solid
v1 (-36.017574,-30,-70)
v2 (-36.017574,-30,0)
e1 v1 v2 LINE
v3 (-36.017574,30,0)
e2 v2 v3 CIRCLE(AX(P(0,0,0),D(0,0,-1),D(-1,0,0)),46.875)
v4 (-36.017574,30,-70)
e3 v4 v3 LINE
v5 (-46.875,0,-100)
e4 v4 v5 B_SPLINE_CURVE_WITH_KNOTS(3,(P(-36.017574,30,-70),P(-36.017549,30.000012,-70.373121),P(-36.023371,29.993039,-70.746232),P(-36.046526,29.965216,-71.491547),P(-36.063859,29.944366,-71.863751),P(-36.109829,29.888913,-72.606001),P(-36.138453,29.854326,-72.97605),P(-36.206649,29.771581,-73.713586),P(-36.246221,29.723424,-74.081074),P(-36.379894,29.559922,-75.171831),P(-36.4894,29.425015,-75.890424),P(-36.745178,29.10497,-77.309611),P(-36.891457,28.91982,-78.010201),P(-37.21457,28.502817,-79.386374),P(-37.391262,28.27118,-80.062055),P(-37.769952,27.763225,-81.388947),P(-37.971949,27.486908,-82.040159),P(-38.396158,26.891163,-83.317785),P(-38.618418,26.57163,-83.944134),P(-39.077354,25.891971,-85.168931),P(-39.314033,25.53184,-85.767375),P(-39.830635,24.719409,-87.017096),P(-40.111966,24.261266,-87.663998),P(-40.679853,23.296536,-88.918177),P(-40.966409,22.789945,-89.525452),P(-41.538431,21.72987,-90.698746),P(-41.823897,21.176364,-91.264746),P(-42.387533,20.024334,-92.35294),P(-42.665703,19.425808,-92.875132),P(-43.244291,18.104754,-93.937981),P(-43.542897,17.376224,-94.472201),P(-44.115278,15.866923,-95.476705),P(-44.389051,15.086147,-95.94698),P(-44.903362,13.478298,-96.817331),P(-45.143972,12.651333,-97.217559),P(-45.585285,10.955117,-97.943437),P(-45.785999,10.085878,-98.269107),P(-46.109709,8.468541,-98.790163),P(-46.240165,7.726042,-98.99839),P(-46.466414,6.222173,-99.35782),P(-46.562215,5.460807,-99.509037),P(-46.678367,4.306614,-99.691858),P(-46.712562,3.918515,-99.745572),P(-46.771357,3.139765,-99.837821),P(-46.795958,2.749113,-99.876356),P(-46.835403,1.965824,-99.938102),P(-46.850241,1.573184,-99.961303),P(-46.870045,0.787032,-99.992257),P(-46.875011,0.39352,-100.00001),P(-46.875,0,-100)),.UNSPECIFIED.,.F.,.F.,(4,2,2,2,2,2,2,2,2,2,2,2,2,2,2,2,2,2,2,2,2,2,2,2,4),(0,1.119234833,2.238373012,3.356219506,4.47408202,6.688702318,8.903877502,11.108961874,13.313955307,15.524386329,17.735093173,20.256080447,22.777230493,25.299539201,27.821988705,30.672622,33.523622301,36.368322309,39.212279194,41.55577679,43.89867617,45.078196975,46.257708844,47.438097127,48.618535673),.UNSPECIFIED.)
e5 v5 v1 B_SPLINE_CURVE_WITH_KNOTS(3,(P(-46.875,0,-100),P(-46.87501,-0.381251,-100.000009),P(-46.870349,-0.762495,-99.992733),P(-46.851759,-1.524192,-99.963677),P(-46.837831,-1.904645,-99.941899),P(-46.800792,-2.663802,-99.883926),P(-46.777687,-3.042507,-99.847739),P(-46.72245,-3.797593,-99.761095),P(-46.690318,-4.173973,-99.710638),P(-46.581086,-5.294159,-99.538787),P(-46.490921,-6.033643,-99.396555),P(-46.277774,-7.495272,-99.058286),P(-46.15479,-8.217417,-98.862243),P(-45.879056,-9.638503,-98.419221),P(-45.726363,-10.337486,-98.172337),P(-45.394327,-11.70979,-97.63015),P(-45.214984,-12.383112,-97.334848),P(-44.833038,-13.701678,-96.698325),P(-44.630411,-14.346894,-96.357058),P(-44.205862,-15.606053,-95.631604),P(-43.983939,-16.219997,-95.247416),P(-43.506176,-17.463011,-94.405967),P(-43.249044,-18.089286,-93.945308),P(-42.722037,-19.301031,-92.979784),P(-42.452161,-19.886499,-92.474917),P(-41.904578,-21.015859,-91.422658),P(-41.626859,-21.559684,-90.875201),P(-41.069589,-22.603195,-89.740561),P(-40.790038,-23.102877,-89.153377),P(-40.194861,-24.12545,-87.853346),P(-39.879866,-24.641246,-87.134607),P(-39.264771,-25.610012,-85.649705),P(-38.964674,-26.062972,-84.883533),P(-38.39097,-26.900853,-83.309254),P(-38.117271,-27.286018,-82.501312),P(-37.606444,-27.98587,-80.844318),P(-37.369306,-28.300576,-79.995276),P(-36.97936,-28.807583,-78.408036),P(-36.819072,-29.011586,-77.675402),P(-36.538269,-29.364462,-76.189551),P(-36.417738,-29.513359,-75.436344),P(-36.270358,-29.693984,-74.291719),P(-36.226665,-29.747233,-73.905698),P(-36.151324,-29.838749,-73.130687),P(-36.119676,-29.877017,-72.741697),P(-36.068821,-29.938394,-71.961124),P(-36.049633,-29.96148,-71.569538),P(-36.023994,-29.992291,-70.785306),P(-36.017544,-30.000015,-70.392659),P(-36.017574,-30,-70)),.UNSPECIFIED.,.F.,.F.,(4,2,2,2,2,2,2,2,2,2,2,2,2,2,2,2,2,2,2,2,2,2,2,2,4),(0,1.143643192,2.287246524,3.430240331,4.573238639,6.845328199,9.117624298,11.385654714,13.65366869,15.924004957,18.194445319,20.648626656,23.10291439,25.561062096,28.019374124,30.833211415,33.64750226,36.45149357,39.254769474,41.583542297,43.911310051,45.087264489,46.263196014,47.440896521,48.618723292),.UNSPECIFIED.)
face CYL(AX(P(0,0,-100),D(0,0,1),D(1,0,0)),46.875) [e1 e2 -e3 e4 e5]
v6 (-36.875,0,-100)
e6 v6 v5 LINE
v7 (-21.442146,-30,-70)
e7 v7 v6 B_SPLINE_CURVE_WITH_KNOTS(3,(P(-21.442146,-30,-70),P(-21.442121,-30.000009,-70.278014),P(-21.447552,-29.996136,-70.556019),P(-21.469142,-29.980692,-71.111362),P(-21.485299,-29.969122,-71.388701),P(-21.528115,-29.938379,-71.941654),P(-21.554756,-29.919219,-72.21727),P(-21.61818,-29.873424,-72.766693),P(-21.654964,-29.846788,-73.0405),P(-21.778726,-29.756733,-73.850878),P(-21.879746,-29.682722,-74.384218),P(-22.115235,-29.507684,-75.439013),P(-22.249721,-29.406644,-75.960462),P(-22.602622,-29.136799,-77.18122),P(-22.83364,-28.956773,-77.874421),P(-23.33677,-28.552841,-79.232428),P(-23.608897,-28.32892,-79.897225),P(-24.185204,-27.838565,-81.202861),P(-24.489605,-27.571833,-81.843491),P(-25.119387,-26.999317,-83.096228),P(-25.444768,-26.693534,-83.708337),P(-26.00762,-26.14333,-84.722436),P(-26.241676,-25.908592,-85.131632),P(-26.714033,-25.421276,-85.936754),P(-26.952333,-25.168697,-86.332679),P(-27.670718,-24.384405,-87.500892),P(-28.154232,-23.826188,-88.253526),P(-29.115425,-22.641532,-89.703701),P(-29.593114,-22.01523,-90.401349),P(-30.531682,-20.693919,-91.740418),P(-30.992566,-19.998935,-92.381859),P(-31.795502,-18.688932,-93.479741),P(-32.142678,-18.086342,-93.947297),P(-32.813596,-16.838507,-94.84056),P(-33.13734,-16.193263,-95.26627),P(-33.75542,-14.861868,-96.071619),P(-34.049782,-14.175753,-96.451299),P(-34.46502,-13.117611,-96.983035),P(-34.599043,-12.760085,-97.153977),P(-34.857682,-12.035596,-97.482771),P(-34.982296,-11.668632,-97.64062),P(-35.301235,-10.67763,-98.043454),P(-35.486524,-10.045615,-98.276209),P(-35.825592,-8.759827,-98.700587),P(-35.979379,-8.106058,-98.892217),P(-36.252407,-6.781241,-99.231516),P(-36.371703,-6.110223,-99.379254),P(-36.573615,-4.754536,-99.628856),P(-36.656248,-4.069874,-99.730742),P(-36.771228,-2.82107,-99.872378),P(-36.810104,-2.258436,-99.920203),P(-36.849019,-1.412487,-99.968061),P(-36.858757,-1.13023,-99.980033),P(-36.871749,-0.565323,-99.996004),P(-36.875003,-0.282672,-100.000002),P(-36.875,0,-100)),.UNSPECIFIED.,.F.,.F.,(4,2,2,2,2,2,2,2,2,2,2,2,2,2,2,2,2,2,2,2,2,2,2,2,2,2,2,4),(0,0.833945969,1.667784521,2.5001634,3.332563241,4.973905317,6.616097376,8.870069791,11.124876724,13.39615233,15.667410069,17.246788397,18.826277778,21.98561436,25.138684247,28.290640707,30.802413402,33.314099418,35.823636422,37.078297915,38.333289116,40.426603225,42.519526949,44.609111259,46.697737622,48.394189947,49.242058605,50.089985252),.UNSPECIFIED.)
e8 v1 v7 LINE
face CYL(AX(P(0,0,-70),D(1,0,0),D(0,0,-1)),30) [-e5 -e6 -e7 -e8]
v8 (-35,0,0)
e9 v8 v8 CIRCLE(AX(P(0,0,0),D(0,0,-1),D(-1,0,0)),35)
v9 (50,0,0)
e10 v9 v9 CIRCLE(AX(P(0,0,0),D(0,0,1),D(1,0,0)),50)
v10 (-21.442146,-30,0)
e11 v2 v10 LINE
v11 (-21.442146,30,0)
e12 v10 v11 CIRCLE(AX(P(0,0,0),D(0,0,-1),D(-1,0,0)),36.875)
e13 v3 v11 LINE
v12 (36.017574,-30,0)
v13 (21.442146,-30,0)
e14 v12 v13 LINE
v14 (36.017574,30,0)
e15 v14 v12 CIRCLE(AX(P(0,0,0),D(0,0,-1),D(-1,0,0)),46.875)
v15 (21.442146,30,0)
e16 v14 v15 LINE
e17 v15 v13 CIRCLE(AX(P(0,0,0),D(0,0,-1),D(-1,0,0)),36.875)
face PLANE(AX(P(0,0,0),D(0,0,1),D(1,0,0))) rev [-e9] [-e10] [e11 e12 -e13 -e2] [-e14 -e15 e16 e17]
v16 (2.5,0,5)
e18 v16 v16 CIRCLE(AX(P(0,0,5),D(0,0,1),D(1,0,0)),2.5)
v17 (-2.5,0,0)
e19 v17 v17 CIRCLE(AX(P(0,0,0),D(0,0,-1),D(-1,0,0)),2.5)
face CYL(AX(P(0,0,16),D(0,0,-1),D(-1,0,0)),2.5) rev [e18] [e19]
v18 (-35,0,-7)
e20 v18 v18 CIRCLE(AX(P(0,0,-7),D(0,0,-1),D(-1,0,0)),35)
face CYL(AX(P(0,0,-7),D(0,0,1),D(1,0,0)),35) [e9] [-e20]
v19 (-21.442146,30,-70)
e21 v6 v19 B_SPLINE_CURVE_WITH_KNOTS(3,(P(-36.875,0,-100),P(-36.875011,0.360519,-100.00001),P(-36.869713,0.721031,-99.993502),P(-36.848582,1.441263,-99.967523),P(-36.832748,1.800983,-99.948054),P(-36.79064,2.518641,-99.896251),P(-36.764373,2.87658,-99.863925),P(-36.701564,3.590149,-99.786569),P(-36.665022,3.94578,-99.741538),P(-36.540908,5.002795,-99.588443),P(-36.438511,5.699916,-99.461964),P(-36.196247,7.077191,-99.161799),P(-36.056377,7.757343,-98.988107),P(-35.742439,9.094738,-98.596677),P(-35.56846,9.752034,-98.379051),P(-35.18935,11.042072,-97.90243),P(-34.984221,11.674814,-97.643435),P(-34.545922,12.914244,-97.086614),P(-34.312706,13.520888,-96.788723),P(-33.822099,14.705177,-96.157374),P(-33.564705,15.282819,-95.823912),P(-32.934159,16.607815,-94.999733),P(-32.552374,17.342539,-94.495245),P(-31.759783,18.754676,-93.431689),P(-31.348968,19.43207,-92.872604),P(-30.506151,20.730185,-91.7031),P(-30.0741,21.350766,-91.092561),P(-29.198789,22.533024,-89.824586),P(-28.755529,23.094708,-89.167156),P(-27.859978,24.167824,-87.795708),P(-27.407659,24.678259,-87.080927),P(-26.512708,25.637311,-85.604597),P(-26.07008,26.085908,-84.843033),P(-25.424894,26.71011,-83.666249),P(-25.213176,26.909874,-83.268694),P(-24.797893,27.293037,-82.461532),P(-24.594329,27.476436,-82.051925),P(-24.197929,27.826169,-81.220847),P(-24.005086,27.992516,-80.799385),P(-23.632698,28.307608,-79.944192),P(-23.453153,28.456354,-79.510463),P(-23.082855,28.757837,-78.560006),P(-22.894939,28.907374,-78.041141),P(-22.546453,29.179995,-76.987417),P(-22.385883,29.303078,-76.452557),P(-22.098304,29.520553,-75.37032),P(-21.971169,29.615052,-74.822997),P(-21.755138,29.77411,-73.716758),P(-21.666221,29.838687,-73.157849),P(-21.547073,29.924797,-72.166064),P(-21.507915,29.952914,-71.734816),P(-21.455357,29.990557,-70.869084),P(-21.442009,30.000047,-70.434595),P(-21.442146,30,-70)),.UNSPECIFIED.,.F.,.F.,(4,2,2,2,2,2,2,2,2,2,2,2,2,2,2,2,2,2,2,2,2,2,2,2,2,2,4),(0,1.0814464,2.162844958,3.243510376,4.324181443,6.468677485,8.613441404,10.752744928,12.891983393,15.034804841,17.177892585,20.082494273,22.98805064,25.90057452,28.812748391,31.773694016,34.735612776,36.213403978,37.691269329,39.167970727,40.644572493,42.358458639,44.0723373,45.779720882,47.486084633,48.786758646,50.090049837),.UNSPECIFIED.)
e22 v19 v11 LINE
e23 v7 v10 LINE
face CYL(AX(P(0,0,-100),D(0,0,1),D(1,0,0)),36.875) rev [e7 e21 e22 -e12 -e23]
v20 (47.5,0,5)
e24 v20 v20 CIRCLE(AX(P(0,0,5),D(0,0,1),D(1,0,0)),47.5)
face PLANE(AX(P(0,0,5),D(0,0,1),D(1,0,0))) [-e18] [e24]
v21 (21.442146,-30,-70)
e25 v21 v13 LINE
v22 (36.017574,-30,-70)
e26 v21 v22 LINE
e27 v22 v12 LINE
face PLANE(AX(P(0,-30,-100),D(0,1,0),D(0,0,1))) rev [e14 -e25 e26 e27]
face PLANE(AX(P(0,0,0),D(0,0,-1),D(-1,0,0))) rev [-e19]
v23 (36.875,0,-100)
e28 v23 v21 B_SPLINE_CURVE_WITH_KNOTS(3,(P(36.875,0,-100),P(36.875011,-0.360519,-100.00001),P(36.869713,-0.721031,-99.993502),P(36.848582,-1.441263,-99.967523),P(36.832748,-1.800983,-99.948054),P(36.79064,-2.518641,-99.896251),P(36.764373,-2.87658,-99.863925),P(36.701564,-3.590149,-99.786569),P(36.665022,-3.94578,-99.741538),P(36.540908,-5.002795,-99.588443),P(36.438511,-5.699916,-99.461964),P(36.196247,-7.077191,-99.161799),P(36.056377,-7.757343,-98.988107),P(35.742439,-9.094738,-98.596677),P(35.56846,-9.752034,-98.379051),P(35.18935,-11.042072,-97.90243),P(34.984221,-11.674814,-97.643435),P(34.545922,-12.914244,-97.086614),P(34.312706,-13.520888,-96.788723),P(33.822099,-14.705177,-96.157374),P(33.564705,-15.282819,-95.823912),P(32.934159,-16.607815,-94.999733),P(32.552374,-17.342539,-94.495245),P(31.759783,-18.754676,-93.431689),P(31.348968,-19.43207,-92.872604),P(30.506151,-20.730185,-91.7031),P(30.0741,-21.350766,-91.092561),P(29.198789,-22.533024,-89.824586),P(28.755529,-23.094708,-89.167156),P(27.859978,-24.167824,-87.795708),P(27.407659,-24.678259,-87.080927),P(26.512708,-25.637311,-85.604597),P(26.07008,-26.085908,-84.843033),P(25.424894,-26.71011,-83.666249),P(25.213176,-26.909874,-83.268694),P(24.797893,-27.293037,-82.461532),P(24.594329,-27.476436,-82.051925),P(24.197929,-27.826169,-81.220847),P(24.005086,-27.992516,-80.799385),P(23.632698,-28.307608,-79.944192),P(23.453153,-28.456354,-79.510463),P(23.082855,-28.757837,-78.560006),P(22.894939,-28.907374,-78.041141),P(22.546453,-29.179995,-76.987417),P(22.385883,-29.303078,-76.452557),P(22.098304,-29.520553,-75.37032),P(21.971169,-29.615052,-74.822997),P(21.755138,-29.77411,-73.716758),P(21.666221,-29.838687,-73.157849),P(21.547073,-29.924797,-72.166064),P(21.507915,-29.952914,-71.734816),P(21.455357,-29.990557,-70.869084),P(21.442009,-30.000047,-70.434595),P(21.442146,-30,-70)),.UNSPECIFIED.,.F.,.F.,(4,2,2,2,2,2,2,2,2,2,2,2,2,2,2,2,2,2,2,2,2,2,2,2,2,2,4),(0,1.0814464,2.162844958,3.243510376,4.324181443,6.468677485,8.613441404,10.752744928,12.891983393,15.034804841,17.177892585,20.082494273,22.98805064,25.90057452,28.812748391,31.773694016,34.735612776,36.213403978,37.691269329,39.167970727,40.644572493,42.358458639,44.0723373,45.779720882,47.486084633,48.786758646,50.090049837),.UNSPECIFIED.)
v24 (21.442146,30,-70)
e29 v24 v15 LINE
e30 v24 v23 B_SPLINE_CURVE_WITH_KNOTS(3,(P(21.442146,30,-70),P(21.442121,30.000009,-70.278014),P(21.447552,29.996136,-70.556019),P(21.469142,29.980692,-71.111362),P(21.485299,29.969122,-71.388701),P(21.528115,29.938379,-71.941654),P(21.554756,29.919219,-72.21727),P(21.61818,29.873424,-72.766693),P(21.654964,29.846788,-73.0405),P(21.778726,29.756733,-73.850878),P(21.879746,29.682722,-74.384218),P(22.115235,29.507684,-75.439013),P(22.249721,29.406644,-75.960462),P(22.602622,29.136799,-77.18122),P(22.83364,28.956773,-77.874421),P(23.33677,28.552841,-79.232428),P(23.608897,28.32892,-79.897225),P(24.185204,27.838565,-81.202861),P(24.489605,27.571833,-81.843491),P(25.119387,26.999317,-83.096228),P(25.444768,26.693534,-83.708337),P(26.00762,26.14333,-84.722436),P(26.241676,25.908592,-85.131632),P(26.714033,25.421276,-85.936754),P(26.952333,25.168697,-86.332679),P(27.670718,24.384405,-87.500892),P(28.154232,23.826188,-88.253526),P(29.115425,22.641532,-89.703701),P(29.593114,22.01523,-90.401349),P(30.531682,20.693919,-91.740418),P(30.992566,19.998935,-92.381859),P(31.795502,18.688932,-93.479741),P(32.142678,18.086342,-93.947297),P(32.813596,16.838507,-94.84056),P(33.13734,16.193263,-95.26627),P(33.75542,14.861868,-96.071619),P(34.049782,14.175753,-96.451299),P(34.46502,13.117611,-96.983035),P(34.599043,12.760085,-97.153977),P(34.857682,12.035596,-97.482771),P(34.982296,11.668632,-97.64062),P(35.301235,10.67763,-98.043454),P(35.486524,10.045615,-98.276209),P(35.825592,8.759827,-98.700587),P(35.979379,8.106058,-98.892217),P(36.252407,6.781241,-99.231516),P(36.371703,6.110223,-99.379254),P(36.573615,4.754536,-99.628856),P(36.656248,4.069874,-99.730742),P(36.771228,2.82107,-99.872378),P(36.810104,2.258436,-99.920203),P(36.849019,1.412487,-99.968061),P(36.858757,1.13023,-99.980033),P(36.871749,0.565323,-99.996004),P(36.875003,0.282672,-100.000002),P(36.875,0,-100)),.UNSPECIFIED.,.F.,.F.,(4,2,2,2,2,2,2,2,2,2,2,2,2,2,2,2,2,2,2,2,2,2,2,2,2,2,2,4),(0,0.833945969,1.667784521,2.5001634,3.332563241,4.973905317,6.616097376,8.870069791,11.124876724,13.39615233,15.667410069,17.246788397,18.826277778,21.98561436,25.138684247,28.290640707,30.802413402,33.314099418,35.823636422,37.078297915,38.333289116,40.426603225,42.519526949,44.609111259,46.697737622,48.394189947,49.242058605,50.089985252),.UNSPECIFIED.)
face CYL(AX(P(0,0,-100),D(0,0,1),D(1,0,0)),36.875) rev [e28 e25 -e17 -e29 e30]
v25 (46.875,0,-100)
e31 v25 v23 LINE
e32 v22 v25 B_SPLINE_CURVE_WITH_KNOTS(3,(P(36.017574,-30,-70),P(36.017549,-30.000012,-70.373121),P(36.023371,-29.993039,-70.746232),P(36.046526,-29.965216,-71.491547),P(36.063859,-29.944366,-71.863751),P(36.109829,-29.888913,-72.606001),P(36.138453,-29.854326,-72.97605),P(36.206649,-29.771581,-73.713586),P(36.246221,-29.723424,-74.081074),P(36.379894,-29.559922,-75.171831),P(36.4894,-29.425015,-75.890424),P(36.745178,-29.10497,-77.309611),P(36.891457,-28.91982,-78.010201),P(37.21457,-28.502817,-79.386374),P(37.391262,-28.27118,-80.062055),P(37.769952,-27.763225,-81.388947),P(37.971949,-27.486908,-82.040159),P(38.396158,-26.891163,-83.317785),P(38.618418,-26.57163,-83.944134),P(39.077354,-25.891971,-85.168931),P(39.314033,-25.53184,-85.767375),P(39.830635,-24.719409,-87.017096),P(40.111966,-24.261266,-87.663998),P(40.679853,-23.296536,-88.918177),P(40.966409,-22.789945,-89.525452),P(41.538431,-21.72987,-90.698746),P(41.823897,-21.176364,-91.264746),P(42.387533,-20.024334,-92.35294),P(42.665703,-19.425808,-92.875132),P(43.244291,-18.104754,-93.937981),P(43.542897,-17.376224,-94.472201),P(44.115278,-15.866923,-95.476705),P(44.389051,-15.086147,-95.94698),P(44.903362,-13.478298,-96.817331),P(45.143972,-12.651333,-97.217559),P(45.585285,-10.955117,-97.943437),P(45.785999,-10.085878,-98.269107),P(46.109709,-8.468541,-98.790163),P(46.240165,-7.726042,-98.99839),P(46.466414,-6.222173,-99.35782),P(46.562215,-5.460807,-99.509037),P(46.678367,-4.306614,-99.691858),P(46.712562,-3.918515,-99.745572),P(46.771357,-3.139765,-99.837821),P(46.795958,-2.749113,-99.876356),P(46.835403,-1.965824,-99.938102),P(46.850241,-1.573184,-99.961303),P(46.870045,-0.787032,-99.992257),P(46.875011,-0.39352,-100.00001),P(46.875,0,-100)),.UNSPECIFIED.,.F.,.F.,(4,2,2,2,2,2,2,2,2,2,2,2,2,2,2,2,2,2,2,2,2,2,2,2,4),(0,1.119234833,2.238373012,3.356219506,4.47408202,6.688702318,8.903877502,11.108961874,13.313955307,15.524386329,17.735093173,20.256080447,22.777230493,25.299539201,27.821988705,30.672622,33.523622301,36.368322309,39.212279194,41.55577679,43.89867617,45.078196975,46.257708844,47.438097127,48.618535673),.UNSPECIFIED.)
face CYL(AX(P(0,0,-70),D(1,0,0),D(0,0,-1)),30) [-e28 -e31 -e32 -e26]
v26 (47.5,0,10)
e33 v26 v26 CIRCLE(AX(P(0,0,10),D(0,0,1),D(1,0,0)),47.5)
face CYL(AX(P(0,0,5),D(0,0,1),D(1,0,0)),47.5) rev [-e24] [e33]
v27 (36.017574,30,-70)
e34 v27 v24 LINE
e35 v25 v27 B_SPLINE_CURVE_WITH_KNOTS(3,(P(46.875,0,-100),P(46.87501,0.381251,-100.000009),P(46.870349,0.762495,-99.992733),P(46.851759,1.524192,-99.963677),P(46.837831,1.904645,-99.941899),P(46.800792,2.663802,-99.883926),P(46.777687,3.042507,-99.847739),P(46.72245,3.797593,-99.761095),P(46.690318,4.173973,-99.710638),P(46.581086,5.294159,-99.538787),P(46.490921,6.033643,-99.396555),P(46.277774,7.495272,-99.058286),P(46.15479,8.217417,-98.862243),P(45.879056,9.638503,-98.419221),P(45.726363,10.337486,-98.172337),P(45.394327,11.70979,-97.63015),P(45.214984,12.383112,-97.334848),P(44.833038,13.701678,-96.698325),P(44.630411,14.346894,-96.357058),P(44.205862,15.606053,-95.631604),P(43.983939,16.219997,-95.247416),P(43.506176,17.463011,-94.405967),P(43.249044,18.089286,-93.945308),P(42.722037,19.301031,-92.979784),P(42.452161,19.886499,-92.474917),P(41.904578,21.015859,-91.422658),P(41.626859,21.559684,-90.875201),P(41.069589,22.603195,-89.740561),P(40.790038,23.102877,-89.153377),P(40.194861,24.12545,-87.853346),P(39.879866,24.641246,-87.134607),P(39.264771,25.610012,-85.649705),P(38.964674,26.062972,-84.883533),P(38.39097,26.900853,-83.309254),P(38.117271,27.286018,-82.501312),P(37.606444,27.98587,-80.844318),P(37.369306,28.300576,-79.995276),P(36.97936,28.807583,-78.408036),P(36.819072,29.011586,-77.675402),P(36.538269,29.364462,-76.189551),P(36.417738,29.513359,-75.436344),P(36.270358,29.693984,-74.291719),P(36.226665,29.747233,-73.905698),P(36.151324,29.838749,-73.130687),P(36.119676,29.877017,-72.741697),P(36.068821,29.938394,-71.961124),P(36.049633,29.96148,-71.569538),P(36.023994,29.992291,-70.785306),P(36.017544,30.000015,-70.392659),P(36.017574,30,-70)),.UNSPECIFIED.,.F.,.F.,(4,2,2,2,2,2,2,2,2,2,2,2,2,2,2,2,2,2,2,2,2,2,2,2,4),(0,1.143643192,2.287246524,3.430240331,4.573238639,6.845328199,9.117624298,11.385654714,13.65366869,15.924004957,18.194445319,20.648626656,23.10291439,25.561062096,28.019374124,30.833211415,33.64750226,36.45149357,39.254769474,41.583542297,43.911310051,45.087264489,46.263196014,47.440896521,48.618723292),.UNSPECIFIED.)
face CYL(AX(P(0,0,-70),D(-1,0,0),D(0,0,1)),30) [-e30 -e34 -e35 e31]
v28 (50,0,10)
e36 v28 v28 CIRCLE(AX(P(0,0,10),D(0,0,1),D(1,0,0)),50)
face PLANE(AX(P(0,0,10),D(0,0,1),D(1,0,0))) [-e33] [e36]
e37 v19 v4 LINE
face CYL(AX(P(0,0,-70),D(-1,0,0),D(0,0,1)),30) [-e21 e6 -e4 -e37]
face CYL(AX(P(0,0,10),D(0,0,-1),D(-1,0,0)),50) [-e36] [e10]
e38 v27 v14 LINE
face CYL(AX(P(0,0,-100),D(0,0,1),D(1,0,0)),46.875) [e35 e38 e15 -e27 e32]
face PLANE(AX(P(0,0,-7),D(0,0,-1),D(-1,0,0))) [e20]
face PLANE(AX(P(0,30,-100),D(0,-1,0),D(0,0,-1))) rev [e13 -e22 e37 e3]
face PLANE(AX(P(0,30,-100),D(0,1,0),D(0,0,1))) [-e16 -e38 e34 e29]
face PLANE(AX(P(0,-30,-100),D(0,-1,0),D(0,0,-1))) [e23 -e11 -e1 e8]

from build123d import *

# Parameters (mm, degrees)
ESQUISSE1_R             = 50
BOSS_EXTRU_1_DEPTH      = 10
ESQUISSE2_R             = 47.5
ENL_V_MAT_EXTRU_1_DEPTH = 5
ESQUISSE3_R             = 2.5
ENL_V_MAT_EXTRU_2_DEPTH = 16
ESQUISSE4_R             = 35
BOSS_EXTRU_2_DEPTH      = 7
BOSS_EXTRU_3_DEPTH      = 100
CONG_1_R                = 30


with BuildPart() as part:
    # Esquisse1 → Boss.-Extru.1 (new body)
    with BuildSketch(Plane.XY):
        Circle(ESQUISSE1_R)
    extrude(amount=BOSS_EXTRU_1_DEPTH)

    # Esquisse2 → Enlèv. mat.-Extru.1 (cut)
    with BuildSketch(Plane.XY.offset(10)):
        Circle(ESQUISSE2_R)
    extrude(amount=-ENL_V_MAT_EXTRU_1_DEPTH, mode=Mode.SUBTRACT)

    # Esquisse3 → Enlèv. mat.-Extru.2 (cut)
    with BuildSketch(Plane(origin=(0, 0, 0), x_dir=(-1, 0, 0), z_dir=(0, 0, -1))):
        Circle(ESQUISSE3_R)
    extrude(amount=-ENL_V_MAT_EXTRU_2_DEPTH, mode=Mode.SUBTRACT)

    # Esquisse4 → Boss.-Extru.2 (add)
    with BuildSketch(Plane(origin=(0, 0, 0), x_dir=(-1, 0, 0), z_dir=(0, 0, -1))):
        Circle(ESQUISSE4_R)
    extrude(amount=BOSS_EXTRU_2_DEPTH)

    # Esquisse5 → Boss.-Extru.3 (add)
    with BuildSketch(Plane(origin=(0, 0, 0), x_dir=(-1, 0, 0), z_dir=(0, 0, -1))):
        with BuildLine():
            Line((-46.875, 0), (-36.875, 0))
            ThreePointArc((-36.875, 0), (-32.790583699, 16.868409696), (-21.442145998, 30))
            Line((-21.442145998, 30), (-36.017573836, 30))
            ThreePointArc((-36.017573836, 30), (-44.077144863, 15.952144863), (-46.875, 0))
        make_face()
        with BuildLine():
            ThreePointArc((-21.442145998, -30), (-32.790583699, -16.868409696), (-36.875, 0))
            Line((-36.875, 0), (-46.875, 0))
            ThreePointArc((-46.875, 0), (-44.077144863, -15.952144863), (-36.017573836, -30))
            Line((-36.017573836, -30), (-21.442145998, -30))
        make_face()
        with BuildLine():
            ThreePointArc((21.442145998, 30), (32.790583699, 16.868409696), (36.875, 0))
            Line((36.875, 0), (46.875, 0))
            ThreePointArc((46.875, 0), (44.077144863, 15.952144863), (36.017573836, 30))
            Line((36.017573836, 30), (21.442145998, 30))
        make_face()
        with BuildLine():
            Line((46.875, 0), (36.875, 0))
            ThreePointArc((36.875, 0), (32.790583699, -16.868409696), (21.442145998, -30))
            Line((21.442145998, -30), (36.017573836, -30))
            ThreePointArc((36.017573836, -30), (44.077144863, -15.952144863), (46.875, 0))
        make_face()
    extrude(amount=BOSS_EXTRU_3_DEPTH)

    # Congé1
    # the kernel refuses this fillet: 30 mm, written as the material it takes off along each edge
    with BuildSketch(Plane(origin=(-53.557854002, 30, -100), x_dir=(0, 0, 1), z_dir=(1, 0, 0)), Plane(origin=(-111.017573836, 30, -100), x_dir=(0, 0, 1), z_dir=(1, 0, 0)), Plane(origin=(111.017573836, -30, -100), x_dir=(0, 0, 1), z_dir=(-1, 0, 0)), Plane(origin=(53.557854002, -30, -100), x_dir=(0, 0, 1), z_dir=(-1, 0, 0))) as cong_1_piece_1:
        with BuildLine():
            CenterArc((CONG_1_R, CONG_1_R), CONG_1_R, 180, 90)
            Line((0, CONG_1_R), (0, 0))
            Line((0, 0), (CONG_1_R, 0))
        make_face()
    extrude(amount=164.575427838, mode=Mode.SUBTRACT)


solid = part.part
